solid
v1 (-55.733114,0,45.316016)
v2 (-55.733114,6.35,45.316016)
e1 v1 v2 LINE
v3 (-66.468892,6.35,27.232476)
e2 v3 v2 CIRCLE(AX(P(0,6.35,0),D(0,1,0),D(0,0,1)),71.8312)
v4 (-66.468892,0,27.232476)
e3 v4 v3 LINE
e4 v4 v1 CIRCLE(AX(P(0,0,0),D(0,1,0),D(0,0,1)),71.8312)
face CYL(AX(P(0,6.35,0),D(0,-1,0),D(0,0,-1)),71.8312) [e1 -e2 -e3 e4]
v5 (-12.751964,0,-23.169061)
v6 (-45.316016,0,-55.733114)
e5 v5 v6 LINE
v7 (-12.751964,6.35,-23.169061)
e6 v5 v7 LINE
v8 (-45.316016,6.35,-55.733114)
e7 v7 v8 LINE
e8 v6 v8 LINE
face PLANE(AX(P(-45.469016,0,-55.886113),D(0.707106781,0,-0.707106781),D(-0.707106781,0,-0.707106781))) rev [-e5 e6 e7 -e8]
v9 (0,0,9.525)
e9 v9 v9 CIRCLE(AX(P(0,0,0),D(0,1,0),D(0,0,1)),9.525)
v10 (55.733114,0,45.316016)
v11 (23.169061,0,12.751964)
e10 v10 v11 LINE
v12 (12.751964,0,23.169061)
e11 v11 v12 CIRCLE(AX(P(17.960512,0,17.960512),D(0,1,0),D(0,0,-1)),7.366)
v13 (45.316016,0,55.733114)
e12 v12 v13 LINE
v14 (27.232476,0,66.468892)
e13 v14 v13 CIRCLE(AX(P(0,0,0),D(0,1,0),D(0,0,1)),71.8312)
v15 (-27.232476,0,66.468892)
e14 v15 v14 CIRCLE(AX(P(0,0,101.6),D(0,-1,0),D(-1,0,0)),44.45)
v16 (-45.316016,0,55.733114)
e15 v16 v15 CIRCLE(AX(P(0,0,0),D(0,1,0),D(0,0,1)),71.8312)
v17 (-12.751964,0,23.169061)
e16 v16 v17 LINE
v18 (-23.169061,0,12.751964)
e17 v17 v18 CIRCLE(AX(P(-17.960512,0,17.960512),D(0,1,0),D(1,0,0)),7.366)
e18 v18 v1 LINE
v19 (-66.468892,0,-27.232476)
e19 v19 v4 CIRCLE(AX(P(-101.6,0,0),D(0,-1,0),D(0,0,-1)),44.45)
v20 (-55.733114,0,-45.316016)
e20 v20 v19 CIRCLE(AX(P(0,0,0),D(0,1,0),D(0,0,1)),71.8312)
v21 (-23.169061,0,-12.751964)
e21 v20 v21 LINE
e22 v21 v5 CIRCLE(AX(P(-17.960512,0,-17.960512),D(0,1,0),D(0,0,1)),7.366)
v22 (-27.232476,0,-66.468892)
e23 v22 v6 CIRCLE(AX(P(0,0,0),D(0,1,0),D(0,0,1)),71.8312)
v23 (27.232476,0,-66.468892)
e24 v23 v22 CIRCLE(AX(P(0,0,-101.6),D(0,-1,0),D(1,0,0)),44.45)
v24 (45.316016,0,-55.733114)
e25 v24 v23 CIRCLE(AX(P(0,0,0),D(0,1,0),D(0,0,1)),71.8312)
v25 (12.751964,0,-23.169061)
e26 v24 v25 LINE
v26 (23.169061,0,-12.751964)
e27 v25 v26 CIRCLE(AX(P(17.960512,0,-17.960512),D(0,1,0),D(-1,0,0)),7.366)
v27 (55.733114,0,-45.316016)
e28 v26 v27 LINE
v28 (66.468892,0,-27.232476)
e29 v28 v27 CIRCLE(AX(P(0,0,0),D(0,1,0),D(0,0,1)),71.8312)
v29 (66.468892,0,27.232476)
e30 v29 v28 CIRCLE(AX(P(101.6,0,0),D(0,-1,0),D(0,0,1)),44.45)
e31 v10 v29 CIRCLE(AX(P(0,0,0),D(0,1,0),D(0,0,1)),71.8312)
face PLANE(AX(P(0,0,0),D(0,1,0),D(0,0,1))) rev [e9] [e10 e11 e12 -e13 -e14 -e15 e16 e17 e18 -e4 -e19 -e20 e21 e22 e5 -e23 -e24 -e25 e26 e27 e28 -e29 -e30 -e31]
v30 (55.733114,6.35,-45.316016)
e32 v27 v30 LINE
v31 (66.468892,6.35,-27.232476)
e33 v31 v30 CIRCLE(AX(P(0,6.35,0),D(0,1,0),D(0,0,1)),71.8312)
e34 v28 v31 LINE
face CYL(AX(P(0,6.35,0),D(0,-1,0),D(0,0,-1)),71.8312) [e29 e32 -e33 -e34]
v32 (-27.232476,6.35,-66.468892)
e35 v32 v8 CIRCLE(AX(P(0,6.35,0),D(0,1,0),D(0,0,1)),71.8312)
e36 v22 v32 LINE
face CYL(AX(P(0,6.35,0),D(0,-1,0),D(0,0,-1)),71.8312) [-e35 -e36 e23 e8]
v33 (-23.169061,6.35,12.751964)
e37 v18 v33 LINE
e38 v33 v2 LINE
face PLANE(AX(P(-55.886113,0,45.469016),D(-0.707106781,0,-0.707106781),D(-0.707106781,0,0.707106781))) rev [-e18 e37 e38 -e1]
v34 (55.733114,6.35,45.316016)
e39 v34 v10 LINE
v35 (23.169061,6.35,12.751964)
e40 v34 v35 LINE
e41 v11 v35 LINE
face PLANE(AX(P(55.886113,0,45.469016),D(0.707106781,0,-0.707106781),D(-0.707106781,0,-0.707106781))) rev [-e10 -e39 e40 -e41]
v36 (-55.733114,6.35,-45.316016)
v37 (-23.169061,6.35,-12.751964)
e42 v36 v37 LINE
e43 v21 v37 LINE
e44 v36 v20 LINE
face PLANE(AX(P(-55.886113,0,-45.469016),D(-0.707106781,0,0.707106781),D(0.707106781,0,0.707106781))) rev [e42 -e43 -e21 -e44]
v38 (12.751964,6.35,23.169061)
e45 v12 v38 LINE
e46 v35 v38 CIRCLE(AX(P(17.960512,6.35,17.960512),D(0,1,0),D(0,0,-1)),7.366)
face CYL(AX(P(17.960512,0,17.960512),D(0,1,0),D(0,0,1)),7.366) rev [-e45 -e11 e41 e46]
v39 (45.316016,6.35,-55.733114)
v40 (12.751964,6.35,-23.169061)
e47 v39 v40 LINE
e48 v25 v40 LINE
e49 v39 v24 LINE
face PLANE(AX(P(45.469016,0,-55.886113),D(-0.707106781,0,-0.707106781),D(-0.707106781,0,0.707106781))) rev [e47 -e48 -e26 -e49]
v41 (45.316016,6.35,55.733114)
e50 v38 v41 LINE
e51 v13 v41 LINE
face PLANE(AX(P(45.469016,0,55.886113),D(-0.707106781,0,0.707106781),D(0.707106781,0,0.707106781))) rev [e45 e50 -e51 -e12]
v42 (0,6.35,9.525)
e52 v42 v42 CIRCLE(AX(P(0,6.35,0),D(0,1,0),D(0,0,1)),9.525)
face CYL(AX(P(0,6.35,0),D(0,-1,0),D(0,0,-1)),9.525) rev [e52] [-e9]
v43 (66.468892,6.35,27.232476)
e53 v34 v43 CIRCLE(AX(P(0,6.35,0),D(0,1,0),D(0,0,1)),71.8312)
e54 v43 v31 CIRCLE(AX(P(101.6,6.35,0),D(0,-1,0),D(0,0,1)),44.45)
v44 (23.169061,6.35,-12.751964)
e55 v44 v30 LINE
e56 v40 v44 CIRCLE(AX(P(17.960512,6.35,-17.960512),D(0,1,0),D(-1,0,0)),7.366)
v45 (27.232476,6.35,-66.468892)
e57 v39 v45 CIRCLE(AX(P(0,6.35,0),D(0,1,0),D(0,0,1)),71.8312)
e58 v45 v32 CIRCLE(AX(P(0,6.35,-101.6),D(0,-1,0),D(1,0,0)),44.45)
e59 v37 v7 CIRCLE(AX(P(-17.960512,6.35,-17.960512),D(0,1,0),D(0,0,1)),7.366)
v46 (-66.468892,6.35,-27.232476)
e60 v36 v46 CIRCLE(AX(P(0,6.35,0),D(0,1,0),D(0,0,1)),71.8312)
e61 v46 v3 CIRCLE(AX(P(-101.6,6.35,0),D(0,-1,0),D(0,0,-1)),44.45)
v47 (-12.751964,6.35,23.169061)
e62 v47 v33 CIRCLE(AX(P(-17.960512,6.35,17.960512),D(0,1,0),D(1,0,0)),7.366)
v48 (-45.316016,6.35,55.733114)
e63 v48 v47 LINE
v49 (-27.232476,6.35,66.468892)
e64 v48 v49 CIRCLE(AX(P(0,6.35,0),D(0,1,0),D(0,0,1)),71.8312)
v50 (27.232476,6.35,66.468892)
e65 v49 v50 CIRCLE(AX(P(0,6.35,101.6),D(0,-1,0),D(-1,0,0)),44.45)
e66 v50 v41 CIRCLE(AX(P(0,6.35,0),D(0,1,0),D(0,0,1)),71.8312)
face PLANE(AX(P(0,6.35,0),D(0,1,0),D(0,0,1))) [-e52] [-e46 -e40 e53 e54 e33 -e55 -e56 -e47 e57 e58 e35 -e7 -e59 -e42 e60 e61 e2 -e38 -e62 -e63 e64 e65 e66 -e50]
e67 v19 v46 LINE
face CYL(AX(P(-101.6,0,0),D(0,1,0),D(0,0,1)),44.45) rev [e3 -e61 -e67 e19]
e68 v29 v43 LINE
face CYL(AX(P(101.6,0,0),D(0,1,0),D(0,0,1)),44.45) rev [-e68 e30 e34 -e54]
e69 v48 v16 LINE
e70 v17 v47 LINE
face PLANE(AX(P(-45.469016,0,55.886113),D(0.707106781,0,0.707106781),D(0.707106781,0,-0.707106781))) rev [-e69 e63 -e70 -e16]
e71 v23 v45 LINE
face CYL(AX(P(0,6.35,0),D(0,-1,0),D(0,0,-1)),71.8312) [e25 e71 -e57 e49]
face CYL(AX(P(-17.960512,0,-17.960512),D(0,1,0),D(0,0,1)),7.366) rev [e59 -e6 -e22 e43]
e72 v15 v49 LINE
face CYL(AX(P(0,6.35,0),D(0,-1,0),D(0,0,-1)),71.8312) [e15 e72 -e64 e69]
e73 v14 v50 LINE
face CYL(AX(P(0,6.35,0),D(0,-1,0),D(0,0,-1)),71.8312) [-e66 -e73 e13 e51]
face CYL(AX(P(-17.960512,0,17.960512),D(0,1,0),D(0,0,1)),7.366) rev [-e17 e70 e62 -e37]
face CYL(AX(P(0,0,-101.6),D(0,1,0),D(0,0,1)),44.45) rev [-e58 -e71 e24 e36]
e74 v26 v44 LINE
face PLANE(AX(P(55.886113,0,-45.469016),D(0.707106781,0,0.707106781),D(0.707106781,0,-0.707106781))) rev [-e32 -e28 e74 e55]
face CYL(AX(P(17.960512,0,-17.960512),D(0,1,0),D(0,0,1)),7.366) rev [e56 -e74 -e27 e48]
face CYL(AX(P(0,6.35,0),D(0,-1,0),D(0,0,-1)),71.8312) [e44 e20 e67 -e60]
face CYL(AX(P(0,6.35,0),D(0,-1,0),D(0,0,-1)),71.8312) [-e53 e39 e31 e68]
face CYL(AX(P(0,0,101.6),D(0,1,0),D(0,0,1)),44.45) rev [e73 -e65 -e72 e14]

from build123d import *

# Parameters (mm, degrees)
SKETCH1_R           = 71.8312
SKETCH1_R_2         = 9.525
BOSS_EXTRUDE1_DEPTH = 6.35
CUT_EXTRUDE1_START  = -6.35
CUT_EXTRUDE1_DEPTH  = 6.35
CIRPATTERN1_COUNT   = 4


# Read off the part's stored shape, not the designer's step: Cut-Extrude1
with BuildPart() as part:
    # Sketch1 → Boss-Extrude1 (new body)
    with BuildSketch(Plane(origin=(0, 0, 0), x_dir=(1, 0, 0), z_dir=(0, 1, 0))):
        with Locations(Location((0, 0, 0), (0, 0, 270))):
            Circle(SKETCH1_R)
        with Locations(Location((0, 0, 0), (0, 0, 270))):
            Circle(SKETCH1_R_2, mode=Mode.SUBTRACT)
    extrude(amount=BOSS_EXTRUDE1_DEPTH)

    # Cut-Extrude1 outline → Cut-Extrude1 (cut)
    with BuildSketch(Plane(origin=(0, 6.35, 0), x_dir=(1, 0, 0), z_dir=(0, 1, 0)).offset(CUT_EXTRUDE1_START)):
        with BuildLine():
            ThreePointArc((-12.751963692, -23.169060792), (-12.751963692, -12.751963692), (-23.169060792, -12.751963692))
            Line((-23.169060792, -12.751963692), (-55.733113553, -45.316016453))
            ThreePointArc((-55.733113553, -45.316016453), (-50.792328621, -50.792328621), (-45.316016453, -55.733113553))
            Line((-45.316016453, -55.733113553), (-12.751963692, -23.169060792))
        make_face()
        with BuildLine():
            ThreePointArc((-66.4688917, 27.232475642), (-71.8312, 0), (-66.4688917, -27.232475642))
            ThreePointArc((-66.4688917, -27.232475642), (-57.15, 0), (-66.4688917, 27.232475642))
        make_face()
    cut_extrude1 = extrude(amount=CUT_EXTRUDE1_DEPTH, mode=Mode.SUBTRACT)

    # CirPattern1: Cut-Extrude1 ×4 about axis
    cirpattern1_axis = Axis((0, 0, 0), (0, 1, 0))
    for i in range(1, CIRPATTERN1_COUNT):
        add(cut_extrude1.rotate(cirpattern1_axis, i * 360 / CIRPATTERN1_COUNT), mode=Mode.SUBTRACT)


solid = part.part
